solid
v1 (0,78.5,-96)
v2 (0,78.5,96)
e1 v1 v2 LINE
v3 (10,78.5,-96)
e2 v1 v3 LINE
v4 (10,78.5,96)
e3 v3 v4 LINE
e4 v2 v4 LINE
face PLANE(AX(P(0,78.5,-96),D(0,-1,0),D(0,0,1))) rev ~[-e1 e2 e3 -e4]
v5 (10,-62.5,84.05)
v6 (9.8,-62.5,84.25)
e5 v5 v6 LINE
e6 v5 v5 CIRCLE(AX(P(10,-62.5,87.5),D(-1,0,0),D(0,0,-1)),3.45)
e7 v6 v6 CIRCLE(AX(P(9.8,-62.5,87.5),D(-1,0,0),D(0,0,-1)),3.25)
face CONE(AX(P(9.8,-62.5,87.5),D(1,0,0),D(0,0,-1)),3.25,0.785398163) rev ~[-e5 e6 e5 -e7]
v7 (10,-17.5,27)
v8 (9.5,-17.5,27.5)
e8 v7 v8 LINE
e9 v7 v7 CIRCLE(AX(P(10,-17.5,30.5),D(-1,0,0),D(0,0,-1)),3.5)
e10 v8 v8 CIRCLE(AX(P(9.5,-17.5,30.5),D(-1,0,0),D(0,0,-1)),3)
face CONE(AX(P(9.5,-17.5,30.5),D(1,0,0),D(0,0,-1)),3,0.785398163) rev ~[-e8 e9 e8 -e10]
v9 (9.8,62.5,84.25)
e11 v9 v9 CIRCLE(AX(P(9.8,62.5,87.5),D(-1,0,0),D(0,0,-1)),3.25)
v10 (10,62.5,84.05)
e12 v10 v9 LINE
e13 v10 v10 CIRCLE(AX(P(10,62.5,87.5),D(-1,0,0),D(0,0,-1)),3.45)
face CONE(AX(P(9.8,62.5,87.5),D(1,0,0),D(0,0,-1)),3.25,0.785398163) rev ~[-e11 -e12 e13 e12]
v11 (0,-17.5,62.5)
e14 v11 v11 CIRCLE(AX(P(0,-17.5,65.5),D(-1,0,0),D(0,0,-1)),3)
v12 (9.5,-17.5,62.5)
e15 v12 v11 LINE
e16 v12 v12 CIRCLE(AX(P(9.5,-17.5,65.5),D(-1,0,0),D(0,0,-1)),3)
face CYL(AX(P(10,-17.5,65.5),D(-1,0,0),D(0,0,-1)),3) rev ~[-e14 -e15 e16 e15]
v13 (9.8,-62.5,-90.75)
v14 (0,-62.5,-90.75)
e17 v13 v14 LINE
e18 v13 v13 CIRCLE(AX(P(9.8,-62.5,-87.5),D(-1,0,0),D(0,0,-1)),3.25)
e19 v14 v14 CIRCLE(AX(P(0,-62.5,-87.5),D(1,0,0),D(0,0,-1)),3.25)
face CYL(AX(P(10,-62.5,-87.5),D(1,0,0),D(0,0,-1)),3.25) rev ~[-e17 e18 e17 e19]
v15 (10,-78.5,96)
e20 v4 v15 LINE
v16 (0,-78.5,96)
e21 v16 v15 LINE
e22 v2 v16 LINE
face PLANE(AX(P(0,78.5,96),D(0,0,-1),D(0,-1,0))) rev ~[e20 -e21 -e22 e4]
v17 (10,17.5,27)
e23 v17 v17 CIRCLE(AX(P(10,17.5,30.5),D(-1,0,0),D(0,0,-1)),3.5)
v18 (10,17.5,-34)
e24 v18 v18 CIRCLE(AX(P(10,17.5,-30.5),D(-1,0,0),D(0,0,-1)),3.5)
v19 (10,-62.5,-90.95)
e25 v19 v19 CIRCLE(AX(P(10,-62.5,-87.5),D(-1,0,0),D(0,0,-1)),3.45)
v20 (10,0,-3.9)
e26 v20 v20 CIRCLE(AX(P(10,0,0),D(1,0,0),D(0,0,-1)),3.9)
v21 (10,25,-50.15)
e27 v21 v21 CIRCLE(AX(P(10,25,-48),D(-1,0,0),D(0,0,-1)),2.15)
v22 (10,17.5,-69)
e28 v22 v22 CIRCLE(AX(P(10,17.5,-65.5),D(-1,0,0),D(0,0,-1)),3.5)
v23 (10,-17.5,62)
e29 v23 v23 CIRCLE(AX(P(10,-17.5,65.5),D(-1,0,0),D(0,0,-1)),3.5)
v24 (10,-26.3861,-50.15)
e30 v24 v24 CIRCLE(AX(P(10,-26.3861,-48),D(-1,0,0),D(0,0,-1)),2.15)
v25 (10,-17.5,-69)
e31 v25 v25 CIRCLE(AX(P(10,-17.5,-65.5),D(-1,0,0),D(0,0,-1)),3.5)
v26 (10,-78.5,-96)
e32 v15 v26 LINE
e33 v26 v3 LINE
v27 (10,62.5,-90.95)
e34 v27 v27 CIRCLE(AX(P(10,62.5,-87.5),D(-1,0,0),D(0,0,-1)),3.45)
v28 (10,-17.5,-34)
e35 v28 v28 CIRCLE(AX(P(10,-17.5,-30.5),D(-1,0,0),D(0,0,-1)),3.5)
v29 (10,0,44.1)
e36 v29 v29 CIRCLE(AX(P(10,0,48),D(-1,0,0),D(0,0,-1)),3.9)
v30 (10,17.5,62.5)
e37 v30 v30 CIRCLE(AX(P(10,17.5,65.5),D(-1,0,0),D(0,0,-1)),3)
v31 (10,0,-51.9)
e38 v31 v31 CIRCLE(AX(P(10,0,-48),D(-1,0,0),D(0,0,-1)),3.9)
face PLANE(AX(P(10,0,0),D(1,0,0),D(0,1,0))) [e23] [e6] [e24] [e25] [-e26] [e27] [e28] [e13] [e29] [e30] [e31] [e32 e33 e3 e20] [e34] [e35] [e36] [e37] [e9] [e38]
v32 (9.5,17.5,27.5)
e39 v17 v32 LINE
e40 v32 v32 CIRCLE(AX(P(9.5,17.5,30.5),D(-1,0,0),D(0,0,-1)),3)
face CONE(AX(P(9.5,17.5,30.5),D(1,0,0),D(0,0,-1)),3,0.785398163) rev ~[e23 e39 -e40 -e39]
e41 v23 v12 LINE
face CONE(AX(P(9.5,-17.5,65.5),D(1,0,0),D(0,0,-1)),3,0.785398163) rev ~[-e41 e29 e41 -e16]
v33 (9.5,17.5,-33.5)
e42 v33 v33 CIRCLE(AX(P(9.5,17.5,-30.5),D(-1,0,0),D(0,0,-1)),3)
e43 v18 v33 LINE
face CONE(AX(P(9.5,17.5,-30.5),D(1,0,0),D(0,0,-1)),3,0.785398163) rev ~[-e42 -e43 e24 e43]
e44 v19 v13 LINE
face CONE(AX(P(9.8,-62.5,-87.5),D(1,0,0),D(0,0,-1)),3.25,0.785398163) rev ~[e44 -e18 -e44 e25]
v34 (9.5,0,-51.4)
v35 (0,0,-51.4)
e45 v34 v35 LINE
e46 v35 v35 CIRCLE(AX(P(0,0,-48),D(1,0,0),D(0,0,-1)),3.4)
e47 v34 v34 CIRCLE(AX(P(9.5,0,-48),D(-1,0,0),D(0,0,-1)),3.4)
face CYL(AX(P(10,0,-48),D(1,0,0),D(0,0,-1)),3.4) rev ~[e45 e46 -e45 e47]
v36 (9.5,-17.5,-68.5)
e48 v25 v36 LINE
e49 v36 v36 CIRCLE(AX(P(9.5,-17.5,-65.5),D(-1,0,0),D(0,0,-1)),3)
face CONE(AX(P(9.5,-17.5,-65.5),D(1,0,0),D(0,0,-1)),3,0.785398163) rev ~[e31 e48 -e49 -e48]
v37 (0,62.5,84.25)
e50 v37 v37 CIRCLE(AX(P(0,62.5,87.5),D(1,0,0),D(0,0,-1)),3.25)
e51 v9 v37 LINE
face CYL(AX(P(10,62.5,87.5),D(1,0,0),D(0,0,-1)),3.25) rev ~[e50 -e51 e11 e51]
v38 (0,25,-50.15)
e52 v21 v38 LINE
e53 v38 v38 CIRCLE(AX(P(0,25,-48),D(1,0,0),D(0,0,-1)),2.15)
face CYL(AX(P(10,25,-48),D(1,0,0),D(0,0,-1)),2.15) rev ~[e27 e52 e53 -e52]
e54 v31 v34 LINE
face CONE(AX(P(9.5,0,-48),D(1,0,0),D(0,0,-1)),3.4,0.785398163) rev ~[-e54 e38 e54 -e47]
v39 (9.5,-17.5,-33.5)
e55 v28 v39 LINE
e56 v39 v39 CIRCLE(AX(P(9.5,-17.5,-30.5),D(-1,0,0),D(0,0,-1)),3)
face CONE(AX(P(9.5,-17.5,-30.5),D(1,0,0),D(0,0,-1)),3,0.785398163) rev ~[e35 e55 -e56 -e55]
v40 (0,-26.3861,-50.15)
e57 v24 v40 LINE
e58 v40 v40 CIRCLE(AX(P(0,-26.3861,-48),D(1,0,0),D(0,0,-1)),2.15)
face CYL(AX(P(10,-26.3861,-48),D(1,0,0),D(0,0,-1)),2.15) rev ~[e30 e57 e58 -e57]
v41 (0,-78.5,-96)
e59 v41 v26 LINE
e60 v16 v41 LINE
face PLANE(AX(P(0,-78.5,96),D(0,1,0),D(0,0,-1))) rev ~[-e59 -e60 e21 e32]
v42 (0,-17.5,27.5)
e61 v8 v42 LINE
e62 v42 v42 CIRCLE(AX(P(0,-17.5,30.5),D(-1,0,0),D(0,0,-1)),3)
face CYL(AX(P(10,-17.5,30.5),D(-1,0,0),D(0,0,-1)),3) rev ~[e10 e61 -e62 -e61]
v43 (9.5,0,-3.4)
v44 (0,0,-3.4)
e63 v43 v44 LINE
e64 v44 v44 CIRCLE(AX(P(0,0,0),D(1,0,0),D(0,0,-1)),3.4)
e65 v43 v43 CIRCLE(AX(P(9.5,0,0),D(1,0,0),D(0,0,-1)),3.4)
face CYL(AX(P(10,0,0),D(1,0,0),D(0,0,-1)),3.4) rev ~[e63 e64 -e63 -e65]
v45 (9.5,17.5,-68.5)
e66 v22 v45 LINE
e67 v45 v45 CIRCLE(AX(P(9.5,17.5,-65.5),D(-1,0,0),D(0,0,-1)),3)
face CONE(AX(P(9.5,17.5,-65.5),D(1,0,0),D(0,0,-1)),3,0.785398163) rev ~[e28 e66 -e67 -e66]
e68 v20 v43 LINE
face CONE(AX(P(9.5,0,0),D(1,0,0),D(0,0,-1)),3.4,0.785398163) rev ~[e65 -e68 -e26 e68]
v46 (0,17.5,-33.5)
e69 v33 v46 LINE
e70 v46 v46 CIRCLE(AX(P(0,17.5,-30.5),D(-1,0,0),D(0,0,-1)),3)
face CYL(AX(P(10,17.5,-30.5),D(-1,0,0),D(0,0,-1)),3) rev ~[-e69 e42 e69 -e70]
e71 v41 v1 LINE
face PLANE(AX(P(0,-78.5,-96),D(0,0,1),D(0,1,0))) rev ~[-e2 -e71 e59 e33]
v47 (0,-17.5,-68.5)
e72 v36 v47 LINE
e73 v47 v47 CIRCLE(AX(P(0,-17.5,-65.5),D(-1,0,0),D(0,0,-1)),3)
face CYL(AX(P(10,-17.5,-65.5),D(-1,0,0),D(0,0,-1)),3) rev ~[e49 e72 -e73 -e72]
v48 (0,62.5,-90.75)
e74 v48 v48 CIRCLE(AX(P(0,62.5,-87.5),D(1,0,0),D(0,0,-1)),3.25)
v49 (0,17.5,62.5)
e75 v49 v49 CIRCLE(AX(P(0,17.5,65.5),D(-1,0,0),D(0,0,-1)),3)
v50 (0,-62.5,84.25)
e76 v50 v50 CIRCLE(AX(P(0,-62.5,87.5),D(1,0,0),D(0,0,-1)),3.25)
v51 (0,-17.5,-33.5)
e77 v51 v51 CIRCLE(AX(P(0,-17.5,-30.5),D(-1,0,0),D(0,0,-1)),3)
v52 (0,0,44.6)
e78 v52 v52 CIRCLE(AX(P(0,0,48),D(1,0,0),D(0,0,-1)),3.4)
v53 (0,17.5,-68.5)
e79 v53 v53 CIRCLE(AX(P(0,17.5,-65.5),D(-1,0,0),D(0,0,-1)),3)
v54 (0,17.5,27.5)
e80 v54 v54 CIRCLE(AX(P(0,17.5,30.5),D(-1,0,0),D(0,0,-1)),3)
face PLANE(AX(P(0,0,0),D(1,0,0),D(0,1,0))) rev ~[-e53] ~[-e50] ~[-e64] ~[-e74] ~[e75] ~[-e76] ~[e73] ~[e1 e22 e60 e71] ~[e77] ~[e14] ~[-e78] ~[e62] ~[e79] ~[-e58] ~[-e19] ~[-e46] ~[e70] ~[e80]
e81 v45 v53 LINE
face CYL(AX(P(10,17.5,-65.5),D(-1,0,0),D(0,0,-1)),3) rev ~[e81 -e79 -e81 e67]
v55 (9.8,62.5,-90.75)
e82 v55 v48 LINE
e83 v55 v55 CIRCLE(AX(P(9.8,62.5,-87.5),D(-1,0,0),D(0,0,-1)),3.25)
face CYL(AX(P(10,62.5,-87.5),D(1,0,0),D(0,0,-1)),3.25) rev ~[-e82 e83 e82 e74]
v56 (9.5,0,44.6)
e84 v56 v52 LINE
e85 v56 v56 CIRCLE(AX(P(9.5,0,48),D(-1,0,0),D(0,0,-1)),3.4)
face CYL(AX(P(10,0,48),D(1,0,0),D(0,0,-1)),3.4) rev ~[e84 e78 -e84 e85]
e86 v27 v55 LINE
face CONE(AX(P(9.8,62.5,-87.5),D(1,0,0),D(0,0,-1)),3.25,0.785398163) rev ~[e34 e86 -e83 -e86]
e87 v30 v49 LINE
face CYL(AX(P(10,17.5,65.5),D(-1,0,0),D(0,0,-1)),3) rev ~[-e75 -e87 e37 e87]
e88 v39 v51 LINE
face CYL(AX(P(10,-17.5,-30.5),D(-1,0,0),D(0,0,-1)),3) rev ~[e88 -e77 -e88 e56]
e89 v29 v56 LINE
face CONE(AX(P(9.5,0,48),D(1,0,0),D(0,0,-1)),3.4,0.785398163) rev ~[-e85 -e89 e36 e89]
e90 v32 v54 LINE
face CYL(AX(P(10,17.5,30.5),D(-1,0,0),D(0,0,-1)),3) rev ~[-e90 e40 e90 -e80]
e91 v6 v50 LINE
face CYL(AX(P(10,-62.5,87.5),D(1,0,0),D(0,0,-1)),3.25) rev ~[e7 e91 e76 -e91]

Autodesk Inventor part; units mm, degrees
ref_plane "YZ Plane" through (0, 0, 0) normal (1, 0, 0) x (0, 1, 0)
ref_plane "XZ Plane" through (0, 0, 0) normal (0, 1, 0) x (-1, 0, 0)
ref_plane "XY Plane" through (0, 0, 0) normal (0, 0, 1) x (1, 0, 0)
sketch "Skizze1" plane through (0, 0, 0) normal (1, 0, 0) x (0, 1, 0)
  line L0 (78.5, 96) -> (-78.5, 96)
  line L1 (-78.5, 96) -> (-78.5, -96)
  line L2 (-78.5, -96) -> (78.5, -96)
  line L3 (78.5, -96) -> (78.5, 96)
  point P0 (0, 0)
  dimension "d0" = 192
  dimension "d1" = 157
  dimension "d2" = 78.5
  dimension "d3" = 96
extrude "Extrusion1" add sketch "Skizze1" along normal blind 10
sketch "草图5" plane through (0, 0, 0) normal (-1, 0, 0) x (0, 0, 1)
  point P0 (0, 0)
sketch "草图6" plane through (10, 0, 0) normal (1, 0, 0) x (0, 0, -1)
  line L0 (-24, 25) -> (-72, 25)
  line L1 (-72, 25) -> (-72, -25)
  line L2 (-72, -25) -> (-24, -25)
  line L3 (-24, -25) -> (-24, 25)
  line L4 (-24, 25) -> (-72, -25) construction
  line L5 (-72, 25) -> (-24, -25) construction
  line L6 (-96, 78.5) -> (-96, -78.5) projected
  line L7 (-65.5, -17.5) -> (-30.5, -17.5)
  line L8 (-30.5, -17.5) -> (-30.5, 17.5)
  line L9 (-30.5, 17.5) -> (-65.5, 17.5)
  line L10 (-65.5, 17.5) -> (-65.5, -17.5)
  line L11 (-65.5, -17.5) -> (-30.5, 17.5) construction
  line L12 (-30.5, -17.5) -> (-65.5, 17.5) construction
  circle A0 centre (-65.5, -17.5) radius 2.5
  circle A1 centre (-30.5, -17.5) radius 2.5
  circle A2 centre (-30.5, 17.5) radius 2.5
  circle A3 centre (-65.5, 17.5) radius 2.5
  line L13 (24, 25) -> (72, 25)
  line L14 (72, 25) -> (72, -25)
  line L15 (72, -25) -> (24, -25)
  line L16 (24, -25) -> (24, 25)
  line L17 (24, 25) -> (72, -25) construction
  line L18 (72, 25) -> (24, -25) construction
  line L19 (65.5, -17.5) -> (30.5, -17.5)
  line L20 (30.5, -17.5) -> (30.5, 17.5)
  line L21 (30.5, 17.5) -> (65.5, 17.5)
  line L22 (65.5, 17.5) -> (65.5, -17.5)
  line L23 (65.5, -17.5) -> (30.5, 17.5) construction
  line L24 (30.5, -17.5) -> (65.5, 17.5) construction
  circle A4 centre (65.5, -17.5) radius 2.5
  circle A5 centre (30.5, -17.5) radius 2.5
  circle A6 centre (30.5, 17.5) radius 2.5
  circle A7 centre (65.5, 17.5) radius 2.5
  point P0 (0, 0)
  point P1 (-48, 0)
  point P2 (-48, 0)
  point P3 (48, 0)
  point P4 (48, 0)
  dimension "d31" = 50
  dimension "d32" = 48
  dimension "d33" = 24
  dimension "d34" = 35
  dimension "d35" = 35
  dimension "d36" = 5
  dimension "d39" = 360
  dimension "d48" = 5
  dimension "d49" = 5
  dimension "d50" = 5
  dimension "d51" = 5
hole "孔1" at (10, -17.5, 65.5) at (10, 17.5, 65.5) at (10, -17.5, 30.5) at (10, -17.5, -30.5) at (10, 17.5, -30.5) at (10, 17.5, -65.5) at (10, -17.5, -65.5) at (10, 17.5, 30.5) direction (-1, 0, 0) diameter 6 end through all
chamfer "倒角1" distance 0.5 angle 45 7 edges at (10, -17.5, -62.5) (10, 17.5, 33.5) (10, -17.5, 33.5) (10, -17.5, 68.5) (10, 17.5, -27.5) (10, -17.5, -27.5) (10, 17.5, -62.5)
sketch "草图7" plane through (10, 0, 0) normal (1, 0, 0) x (0, 0, -1)
  circle A0 centre (0, 0) radius 3.4
  circle A1 centre (30.5, 17.5) radius 3 projected
  circle A2 centre (65.5, -17.5) radius 3.5 projected
  line L0 (30.5, 17.5) -> (65.5, -17.5)
  circle A3 centre (65.5, 17.5) radius 3 projected
  line L1 (65.5, 17.5) -> (30.5, -17.5)
  circle A4 centre (48, 0) radius 3.4
  circle A5 centre (-65.5, 17.5) radius 2.4585 projected
  circle A6 centre (-30.5, -17.5) radius 3 projected
  line L2 (-65.5, 17.5) -> (-30.5, -17.5)
  circle A7 centre (-30.5, 17.5) radius 3 projected
  line L3 (-30.5, 17.5) -> (-65.5, -17.5)
  circle A8 centre (-48, 0) radius 3.4
  line L4 (48, 0) -> (48, 35)
  line L5 (37, 0) -> (59, 0)
  line L6 (43, 30) -> (54, 30)
  circle A9 centre (48, 25) radius 2.15
  line L7 (48, 0) -> (48, -21)
  circle A10 centre (48, -26.3861) radius 2.15
  line L8 (43, -25.3) -> (55, -25.3)
  line L9 (48, -20) -> (48, -32)
  dimension "d58" = 6.8
  dimension "d59" = 6.8
  dimension "d60" = 6.8
  dimension "d89" = 30
  dimension "d90" = 4.3
  dimension "d95" = 25.3
extrude "拉伸4" cut sketch "草图7" against normal blind 10 contours A0 | A4 L4 L0 | L0 L5 A4 | L5 A4 L0 | L4 A4 L1 | L7 A4 L1 | L1 A4 L5 | L1 A4 L5 | L0 A4 L7 | A8 L3 L2 | L2 L3 A8 | L3 A8 L2 | L2 A8 L3 | A9 L4 | L4 A9 | A10 L9 L8 | L8 L9 A10 | A10 L8 L9 | L9 L8 A10
chamfer "倒角3" distance 0.5 angle 45 3 edges at (10, 0, 51.4) (10, 0, 3.4) (10, 0, -44.6)
thread "螺纹3" size "M7x1" class "6H" standard "ANSI Metric M Profile" length 10
thread "螺纹4" size "M7x1" class "6H" standard "ANSI Metric M Profile" length 10
thread "螺纹5" size "M7x1" class "6H" standard "ANSI Metric M Profile" length 10
sketch "草图8" plane through (10, 0, 0) normal (1, 0, 0) x (0, 0, -1)
  line L0 (-87.5, 62.5) -> (87.5, 62.5)
  line L1 (87.5, 62.5) -> (87.5, -62.5)
  line L2 (87.5, -62.5) -> (-87.5, -62.5)
  line L3 (-87.5, -62.5) -> (-87.5, 62.5)
  circle A0 centre (0, 0) radius 3.9 projected
  line L4 (-87.5, 62.5) -> (87.5, -62.5) construction
  line L5 (87.5, 62.5) -> (-87.5, -62.5) construction
  circle A1 centre (-87.5, 62.5) radius 3.25
  line L6 (-152, 0) -> (160, 0)
  line L7 (0, 94) -> (0, -105)
  circle A2 centre (-87.5, -62.5) radius 3.25
  circle A3 centre (87.5, 62.5) radius 3.25
  circle A4 centre (87.5, -62.5) radius 3.25
  dimension "d72" = 175
  dimension "d73" = 125
  dimension "d74" = 6.5
extrude "拉伸5" cut sketch "草图8" against normal blind 10 contours L3 A1 L0 | L0 A1 L3 | A3 L1 L0 | L0 L1 A3 | A2 L2 L3 | L3 L2 A2 | A4 L2 L1 | L1 L2 A4
chamfer "倒角4" distance 0.2 angle 45 4 edges at (10, 62.5, 90.75) (10, 62.5, -84.25) (10, -62.5, -84.25) (10, -62.5, 90.75)
thread "螺纹6" size "M7x1" class "6H" standard "ANSI Metric M Profile" length 10
thread "螺纹7" size "M7x1" class "6H" standard "ANSI Metric M Profile" length 10
thread "螺纹8" size "M7x1" class "6H" standard "ANSI Metric M Profile" length 10
thread "螺纹9" size "M7x1" class "6H" standard "ANSI Metric M Profile" length 10
thread "螺纹10" size "M4.5x0.75" class "6H" standard "ANSI Metric M Profile" length 10
thread "螺纹11" size "M4.5x0.75" class "6H" standard "ANSI Metric M Profile" length 10
properties part number "Adapterplatte_messstage_Gong_2025-03-28v00r00grm"
